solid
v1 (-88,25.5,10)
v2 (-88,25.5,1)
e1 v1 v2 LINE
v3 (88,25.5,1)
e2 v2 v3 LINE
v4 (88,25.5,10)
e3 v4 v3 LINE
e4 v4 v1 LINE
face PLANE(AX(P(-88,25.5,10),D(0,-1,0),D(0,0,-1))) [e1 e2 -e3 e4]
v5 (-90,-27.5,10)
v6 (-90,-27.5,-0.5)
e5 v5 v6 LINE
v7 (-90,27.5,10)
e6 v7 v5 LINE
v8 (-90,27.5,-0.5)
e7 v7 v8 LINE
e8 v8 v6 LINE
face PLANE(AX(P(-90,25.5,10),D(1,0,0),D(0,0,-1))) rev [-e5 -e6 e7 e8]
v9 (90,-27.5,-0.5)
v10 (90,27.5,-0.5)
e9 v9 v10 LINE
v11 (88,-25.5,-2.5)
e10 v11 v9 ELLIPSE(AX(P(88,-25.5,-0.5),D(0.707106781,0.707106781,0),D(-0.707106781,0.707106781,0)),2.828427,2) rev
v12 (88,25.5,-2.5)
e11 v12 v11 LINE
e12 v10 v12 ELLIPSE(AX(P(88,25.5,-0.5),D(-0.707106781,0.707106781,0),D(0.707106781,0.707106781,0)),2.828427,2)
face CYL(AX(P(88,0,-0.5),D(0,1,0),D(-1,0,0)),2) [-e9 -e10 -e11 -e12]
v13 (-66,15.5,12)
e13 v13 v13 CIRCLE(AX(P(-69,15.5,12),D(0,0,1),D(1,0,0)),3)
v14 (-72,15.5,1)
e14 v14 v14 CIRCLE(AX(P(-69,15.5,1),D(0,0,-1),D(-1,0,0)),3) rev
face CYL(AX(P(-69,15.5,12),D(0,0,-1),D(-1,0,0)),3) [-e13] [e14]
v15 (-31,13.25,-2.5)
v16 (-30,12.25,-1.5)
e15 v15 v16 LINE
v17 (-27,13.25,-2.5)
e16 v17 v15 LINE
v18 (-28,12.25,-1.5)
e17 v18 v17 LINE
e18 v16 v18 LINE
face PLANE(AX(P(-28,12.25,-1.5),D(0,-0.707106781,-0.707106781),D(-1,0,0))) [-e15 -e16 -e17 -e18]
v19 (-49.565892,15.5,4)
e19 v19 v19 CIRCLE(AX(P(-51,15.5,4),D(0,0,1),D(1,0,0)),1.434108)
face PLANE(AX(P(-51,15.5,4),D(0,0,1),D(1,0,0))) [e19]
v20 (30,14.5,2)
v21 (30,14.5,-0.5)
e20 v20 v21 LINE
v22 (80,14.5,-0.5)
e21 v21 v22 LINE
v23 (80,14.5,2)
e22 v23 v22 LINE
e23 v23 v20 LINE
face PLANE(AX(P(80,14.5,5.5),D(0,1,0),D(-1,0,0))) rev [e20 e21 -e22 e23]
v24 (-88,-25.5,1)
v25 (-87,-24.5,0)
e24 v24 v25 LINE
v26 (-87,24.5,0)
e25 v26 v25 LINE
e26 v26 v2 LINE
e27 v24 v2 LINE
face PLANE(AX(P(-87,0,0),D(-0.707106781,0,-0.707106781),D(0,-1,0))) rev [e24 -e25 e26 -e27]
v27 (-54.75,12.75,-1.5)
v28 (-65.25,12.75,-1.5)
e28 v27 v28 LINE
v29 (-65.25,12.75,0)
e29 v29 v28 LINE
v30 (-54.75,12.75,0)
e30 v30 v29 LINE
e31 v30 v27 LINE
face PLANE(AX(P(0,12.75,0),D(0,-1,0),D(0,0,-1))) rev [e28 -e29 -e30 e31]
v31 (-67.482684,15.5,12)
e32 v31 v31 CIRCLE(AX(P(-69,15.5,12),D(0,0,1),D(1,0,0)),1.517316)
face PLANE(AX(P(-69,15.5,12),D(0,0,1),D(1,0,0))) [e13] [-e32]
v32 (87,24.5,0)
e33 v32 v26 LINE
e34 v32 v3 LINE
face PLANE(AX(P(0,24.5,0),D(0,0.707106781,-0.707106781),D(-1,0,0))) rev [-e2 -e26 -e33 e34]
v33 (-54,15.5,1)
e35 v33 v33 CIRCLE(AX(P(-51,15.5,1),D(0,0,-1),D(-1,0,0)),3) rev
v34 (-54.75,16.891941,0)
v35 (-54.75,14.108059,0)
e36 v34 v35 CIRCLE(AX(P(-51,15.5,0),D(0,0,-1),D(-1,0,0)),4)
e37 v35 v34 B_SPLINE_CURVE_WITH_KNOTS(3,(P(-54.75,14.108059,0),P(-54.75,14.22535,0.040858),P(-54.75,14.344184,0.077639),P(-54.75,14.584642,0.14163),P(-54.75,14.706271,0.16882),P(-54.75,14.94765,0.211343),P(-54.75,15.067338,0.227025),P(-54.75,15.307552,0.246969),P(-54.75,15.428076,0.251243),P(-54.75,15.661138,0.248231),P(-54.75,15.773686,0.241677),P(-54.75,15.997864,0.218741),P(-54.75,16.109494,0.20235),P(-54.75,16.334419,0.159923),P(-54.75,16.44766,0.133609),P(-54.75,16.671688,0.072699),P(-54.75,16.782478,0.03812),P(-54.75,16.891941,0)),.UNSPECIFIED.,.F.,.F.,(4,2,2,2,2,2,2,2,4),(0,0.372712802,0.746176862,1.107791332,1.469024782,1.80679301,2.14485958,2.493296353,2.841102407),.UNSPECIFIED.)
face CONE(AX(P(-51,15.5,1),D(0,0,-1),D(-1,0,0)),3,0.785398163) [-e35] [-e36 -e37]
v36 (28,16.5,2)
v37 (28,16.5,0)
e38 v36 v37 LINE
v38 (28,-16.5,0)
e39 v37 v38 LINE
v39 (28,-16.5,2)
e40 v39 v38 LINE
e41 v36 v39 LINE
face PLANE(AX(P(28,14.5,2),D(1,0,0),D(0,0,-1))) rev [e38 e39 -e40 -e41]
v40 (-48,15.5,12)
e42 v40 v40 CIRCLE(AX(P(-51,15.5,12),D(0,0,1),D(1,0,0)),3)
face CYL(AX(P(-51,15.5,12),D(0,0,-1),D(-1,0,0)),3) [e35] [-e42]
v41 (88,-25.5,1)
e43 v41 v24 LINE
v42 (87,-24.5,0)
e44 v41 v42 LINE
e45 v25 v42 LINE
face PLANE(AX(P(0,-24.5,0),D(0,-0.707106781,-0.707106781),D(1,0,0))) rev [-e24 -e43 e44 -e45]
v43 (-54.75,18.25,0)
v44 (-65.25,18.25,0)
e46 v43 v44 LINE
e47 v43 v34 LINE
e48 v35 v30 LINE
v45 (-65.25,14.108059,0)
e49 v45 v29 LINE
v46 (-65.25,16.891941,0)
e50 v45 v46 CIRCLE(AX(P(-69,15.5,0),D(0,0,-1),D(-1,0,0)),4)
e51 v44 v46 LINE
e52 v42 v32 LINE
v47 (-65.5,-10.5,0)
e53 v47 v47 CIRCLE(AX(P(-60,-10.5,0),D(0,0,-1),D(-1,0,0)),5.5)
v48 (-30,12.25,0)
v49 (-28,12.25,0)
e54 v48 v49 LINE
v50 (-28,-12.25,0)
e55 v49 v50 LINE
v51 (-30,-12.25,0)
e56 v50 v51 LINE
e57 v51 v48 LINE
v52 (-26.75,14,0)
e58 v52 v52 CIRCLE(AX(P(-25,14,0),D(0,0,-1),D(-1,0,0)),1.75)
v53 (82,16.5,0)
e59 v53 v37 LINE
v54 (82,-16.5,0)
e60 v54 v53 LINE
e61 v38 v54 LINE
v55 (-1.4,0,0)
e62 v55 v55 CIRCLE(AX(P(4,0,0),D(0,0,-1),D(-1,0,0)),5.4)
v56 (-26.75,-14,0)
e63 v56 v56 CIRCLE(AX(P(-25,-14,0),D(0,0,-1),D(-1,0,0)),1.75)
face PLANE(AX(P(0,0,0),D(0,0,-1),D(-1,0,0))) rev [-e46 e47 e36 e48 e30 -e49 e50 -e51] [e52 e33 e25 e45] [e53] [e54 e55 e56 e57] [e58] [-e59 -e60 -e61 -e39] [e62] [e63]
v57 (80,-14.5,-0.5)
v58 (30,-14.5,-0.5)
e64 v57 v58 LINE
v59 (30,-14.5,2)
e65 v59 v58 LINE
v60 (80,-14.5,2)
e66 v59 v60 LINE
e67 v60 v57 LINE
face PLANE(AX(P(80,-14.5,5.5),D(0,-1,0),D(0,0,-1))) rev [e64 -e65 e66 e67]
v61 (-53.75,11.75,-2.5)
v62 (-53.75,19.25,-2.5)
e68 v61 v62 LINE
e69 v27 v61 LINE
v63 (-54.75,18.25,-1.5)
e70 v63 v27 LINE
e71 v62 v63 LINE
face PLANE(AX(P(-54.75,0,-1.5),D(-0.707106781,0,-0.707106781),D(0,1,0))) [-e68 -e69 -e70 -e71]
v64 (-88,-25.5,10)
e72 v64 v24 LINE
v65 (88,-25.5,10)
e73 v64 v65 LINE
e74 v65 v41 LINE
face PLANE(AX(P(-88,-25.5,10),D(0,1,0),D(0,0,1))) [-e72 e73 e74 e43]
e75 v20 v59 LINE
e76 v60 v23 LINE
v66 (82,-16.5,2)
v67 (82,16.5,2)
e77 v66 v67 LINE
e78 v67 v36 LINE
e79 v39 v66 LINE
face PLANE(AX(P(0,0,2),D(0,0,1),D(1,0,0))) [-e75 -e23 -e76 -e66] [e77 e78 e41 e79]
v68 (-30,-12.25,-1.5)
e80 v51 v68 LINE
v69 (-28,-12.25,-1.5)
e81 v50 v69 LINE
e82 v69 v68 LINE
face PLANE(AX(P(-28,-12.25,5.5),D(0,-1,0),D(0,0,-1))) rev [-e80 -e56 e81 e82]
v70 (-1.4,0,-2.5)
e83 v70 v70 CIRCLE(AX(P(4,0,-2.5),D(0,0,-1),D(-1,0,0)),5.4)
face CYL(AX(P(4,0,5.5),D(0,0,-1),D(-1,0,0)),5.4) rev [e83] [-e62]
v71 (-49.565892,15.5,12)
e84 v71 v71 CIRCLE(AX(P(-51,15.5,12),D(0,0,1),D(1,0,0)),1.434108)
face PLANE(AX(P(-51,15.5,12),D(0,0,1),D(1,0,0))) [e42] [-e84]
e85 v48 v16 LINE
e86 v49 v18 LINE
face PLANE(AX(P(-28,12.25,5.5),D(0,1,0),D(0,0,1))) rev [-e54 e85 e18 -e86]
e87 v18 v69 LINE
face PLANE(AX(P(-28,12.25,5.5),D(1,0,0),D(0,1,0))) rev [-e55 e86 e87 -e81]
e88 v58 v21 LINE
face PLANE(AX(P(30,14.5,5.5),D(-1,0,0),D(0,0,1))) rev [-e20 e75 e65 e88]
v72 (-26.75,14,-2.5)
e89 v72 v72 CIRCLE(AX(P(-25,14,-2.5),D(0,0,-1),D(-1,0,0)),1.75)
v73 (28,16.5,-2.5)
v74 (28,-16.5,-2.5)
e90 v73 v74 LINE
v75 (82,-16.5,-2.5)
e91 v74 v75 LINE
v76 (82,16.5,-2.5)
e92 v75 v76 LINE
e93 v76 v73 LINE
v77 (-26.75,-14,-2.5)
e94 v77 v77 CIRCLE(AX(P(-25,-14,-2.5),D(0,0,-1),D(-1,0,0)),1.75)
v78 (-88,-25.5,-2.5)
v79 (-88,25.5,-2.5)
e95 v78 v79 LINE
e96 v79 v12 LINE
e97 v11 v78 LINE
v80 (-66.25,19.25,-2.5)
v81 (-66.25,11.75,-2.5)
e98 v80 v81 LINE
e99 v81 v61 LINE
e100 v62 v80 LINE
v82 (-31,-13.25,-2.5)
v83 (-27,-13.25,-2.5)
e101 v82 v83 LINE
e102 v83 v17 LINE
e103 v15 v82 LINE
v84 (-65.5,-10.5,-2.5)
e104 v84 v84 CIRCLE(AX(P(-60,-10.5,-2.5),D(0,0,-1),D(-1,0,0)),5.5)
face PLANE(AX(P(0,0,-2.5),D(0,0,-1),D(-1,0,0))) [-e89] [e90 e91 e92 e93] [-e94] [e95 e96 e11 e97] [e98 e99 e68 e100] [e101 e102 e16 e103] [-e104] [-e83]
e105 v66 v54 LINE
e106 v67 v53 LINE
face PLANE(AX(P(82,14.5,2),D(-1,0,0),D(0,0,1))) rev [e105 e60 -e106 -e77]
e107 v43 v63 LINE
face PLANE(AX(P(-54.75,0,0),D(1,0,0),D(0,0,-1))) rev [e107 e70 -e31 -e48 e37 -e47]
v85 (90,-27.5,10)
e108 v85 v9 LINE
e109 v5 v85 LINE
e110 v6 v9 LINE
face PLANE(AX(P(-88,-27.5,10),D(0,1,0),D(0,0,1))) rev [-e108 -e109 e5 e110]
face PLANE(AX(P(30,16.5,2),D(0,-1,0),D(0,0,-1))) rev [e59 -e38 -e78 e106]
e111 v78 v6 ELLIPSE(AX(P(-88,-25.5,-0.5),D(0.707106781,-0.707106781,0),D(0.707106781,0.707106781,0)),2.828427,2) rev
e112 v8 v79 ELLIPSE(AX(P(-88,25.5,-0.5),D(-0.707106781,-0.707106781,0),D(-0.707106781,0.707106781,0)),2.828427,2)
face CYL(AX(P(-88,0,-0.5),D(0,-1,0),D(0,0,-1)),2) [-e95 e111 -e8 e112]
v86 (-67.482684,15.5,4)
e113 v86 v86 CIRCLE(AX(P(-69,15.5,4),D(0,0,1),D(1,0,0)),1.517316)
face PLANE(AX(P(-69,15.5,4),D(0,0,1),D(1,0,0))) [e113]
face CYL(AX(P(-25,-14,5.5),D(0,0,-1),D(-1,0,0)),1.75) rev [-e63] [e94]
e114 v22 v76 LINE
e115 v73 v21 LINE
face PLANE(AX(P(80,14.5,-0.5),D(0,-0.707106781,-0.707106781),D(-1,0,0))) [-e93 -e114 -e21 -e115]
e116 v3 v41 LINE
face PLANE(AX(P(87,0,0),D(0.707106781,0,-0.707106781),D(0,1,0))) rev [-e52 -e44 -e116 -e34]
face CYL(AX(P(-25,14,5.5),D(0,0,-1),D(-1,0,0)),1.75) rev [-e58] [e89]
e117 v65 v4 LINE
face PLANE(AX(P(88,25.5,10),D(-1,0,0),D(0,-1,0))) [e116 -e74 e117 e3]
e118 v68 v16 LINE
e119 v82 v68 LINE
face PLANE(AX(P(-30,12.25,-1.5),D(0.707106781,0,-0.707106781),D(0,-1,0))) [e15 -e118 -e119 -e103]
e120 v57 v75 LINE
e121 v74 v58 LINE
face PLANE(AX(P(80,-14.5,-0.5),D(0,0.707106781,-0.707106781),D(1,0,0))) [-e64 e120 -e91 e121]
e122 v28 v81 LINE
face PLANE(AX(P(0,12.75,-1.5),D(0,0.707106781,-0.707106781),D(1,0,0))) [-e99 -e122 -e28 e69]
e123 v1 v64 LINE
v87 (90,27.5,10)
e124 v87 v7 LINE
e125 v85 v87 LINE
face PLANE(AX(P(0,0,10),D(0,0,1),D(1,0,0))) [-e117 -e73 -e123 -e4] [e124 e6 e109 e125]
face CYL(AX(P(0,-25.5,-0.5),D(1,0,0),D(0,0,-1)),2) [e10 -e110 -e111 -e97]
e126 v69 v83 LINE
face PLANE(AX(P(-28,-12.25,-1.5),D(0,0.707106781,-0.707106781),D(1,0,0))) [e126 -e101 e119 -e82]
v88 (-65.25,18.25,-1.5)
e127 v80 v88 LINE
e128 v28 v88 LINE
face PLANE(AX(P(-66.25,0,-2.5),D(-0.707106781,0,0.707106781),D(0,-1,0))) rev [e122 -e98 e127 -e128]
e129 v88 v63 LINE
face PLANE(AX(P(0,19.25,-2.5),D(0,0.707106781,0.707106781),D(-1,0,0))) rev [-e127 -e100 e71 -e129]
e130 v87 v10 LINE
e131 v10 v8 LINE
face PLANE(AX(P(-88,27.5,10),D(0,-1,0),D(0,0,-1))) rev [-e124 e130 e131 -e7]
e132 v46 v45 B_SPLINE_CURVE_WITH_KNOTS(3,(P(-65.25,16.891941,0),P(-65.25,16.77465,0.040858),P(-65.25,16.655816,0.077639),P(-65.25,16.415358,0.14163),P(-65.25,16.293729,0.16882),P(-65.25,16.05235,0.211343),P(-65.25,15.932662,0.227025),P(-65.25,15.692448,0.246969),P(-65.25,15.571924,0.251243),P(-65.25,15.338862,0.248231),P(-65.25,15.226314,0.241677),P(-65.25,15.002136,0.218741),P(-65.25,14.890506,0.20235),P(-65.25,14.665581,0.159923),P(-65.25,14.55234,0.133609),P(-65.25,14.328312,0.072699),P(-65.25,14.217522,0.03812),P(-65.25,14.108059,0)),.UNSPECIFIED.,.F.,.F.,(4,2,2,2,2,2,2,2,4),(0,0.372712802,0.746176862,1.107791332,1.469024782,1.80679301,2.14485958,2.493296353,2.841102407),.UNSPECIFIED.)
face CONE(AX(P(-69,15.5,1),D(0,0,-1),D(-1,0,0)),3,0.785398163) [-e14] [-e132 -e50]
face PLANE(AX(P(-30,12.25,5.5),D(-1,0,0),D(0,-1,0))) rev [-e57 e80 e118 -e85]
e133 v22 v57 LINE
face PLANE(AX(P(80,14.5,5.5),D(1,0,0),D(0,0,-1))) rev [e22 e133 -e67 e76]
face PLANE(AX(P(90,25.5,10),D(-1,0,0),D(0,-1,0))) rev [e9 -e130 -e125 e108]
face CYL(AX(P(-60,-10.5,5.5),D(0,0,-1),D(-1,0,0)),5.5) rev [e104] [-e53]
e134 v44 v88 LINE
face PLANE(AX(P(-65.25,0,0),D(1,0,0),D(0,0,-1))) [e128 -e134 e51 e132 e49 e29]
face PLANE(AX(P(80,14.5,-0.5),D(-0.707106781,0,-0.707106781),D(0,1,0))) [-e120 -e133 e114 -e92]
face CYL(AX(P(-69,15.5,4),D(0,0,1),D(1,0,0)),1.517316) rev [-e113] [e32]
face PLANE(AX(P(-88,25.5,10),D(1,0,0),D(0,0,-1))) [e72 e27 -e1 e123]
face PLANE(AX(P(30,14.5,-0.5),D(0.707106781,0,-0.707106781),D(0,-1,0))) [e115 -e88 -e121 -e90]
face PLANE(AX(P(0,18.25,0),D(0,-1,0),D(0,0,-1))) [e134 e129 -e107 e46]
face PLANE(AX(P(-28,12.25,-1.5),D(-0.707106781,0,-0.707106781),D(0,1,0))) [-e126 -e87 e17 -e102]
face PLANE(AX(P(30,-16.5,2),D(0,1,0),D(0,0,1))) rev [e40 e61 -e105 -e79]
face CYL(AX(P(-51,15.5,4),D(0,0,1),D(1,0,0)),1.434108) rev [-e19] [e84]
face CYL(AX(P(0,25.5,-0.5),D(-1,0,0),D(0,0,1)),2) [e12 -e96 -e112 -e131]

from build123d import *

# Parameters (mm, degrees)
SKETCH_1_W          = 180
SKETCH_1_H          = 55
SKETCH_1_W_2        = 176
SKETCH_1_H_2        = 51
EXTRUDE_1_DEPTH     = 10
SKETCH_4_W          = 180
SKETCH_4_H          = 55
EXTRUDE_2_DEPTH     = 2.5
SKETCH_5_W          = 10.5
SKETCH_5_H          = 5.5
CUT_EXTRUDE_1_DEPTH = 2.5
SKETCH_7_R          = 3
EXTRUDE_3_DEPTH     = 12
SKETCH_8_R          = 1.517316024
SKETCH_8_R_2        = 1.4341078
CUT_EXTRUDE_2_DEPTH = 8
SKETCH_9_R          = 5.5
CUT_EXTRUDE_3_DEPTH = 8
SKETCH_10_R         = 1.75
CUT_EXTRUDE_4_DEPTH = 8
SKETCH_12_W         = 2
SKETCH_12_H         = 24.5
CUT_EXTRUDE_5_DEPTH = 8
SKETCH_13_R         = 5.4
CUT_EXTRUDE_6_DEPTH = 8
SKETCH_15_W         = 50
SKETCH_15_H         = 29
CUT_EXTRUDE_7_DEPTH = 8
SKETCH_16_W         = 54
SKETCH_16_H         = 33
SKETCH_16_W_2       = 50
SKETCH_16_H_2       = 29
EXTRUDE_2_2_DEPTH   = 2
CHAMFER_1_SIZE      = 2
CHAMFER_2_SIZE      = 1
CHAMFER_3_SIZE      = 1
CHAMFER_4_SIZE      = 1
CHAMFER_5_SIZE      = 1
FILLET_1_R          = 2


with BuildPart() as part:
    # Эскиз1 → Вытянуть-Тонкостенный1 (new body)
    with BuildSketch(Plane.XY):
        Rectangle(SKETCH_1_W, SKETCH_1_H)
        Rectangle(SKETCH_1_W_2, SKETCH_1_H_2, mode=Mode.SUBTRACT)
    extrude(amount=EXTRUDE_1_DEPTH)

    # Эскиз4 → Extrude 2 (add)
    with BuildSketch(Plane(origin=(0, 0, 0), x_dir=(-1, 0, 0), z_dir=(0, 0, -1))):
        Rectangle(SKETCH_4_W, SKETCH_4_H)
    extrude(amount=EXTRUDE_2_DEPTH)

    # Эскиз5 → Вырез-Вытянуть1 (cut)
    with BuildSketch(Plane(origin=(0, 0, -2.5), x_dir=(-1, 0, 0), z_dir=(0, 0, -1))):
        with Locations((60, 15.5)):
            Rectangle(SKETCH_5_W, SKETCH_5_H)
    extrude(amount=-CUT_EXTRUDE_1_DEPTH, mode=Mode.SUBTRACT)

    # Эскиз7 → Бобышка-Вытянуть3 (add)
    with BuildSketch(Plane.XY):
        with Locations(Location((-51, 15.5, 0), (0, 0, 180))):
            Circle(SKETCH_7_R)
        with Locations(Location((-69, 15.5, 0), (0, 0, 180))):
            Circle(SKETCH_7_R)
    extrude(amount=EXTRUDE_3_DEPTH)

    # Эскиз8 → Вырез-Вытянуть2 (cut)
    with BuildSketch(Plane.XY.offset(12)):
        with Locations((-69, 15.5)):
            Circle(SKETCH_8_R)
        with Locations((-51, 15.5)):
            Circle(SKETCH_8_R_2)
    extrude(amount=-CUT_EXTRUDE_2_DEPTH, mode=Mode.SUBTRACT)

    # Эскиз9 → Вырез-Вытянуть3 (cut)
    with BuildSketch(Plane(origin=(0, 0, -2.5), x_dir=(-1, 0, 0), z_dir=(0, 0, -1))):
        with Locations((60, -10.5)):
            Circle(SKETCH_9_R)
    extrude(amount=-CUT_EXTRUDE_3_DEPTH, mode=Mode.SUBTRACT)

    # Эскиз10 → Вырез-Вытянуть4 (cut)
    with BuildSketch(Plane(origin=(0, 0, -2.5), x_dir=(-1, 0, 0), z_dir=(0, 0, -1))):
        with Locations((25, 14)):
            Circle(SKETCH_10_R)
        with Locations((25, -14)):
            Circle(SKETCH_10_R)
    extrude(amount=-CUT_EXTRUDE_4_DEPTH, mode=Mode.SUBTRACT)

    # Эскиз12 → Вырез-Вытянуть5 (cut)
    with BuildSketch(Plane(origin=(0, 0, -2.5), x_dir=(-1, 0, 0), z_dir=(0, 0, -1))):
        with Locations((29, 0)):
            Rectangle(SKETCH_12_W, SKETCH_12_H)
    extrude(amount=-CUT_EXTRUDE_5_DEPTH, mode=Mode.SUBTRACT)

    # Эскиз13 → Вырез-Вытянуть6 (cut)
    with BuildSketch(Plane(origin=(0, 0, -2.5), x_dir=(-1, 0, 0), z_dir=(0, 0, -1))):
        with Locations((-4, 0)):
            Circle(SKETCH_13_R)
    extrude(amount=-CUT_EXTRUDE_6_DEPTH, mode=Mode.SUBTRACT)

    # Эскиз15 → Вырез-Вытянуть7 (cut)
    with BuildSketch(Plane(origin=(0, 0, -2.5), x_dir=(-1, 0, 0), z_dir=(0, 0, -1))):
        with Locations((-55, 0)):
            Rectangle(SKETCH_15_W, SKETCH_15_H)
    extrude(amount=-CUT_EXTRUDE_7_DEPTH, mode=Mode.SUBTRACT)

    # Эскиз16 → Extrude 2 2 (add)
    with BuildSketch(Plane.XY):
        with Locations((55, 0)):
            Rectangle(SKETCH_16_W, SKETCH_16_H)
        with Locations((55, 0)):
            Rectangle(SKETCH_16_W_2, SKETCH_16_H_2, mode=Mode.SUBTRACT)
    extrude(amount=EXTRUDE_2_2_DEPTH)

    # Фаска1
    chamfer_1_edges = [part.edges().sort_by_distance(p)[0] for p in [
        (80, 0, -2.5),
        (55, -14.5, -2.5),
        (30, 0, -2.5),
        (55, 14.5, -2.5),
    ]]
    chamfer(chamfer_1_edges, length=CHAMFER_1_SIZE)

    # Фаска2
    chamfer_2_edges = [part.edges().sort_by_distance(p)[0] for p in [
        (-30, 0, -2.5),
        (-29, 12.25, -2.5),
        (-28, 0, -2.5),
        (-29, -12.25, -2.5),
    ]]
    chamfer(chamfer_2_edges, length=CHAMFER_2_SIZE)

    # Фаска3
    chamfer_3_edges = [part.edges().sort_by_distance(p)[0] for p in [
        (-65.25, 15.5, -2.5),
        (-60, 18.25, -2.5),
        (-54.75, 15.5, -2.5),
        (-60, 12.75, -2.5),
    ]]
    chamfer(chamfer_3_edges, length=CHAMFER_3_SIZE)

    # Фаска4
    # the kernel refuses this chamfer: 1 mm, written as the material it adds along each edge
    with BuildSketch(Plane(origin=(-51, 15.5, 0), x_dir=(-1, 0, 0), z_dir=(0, 1, 0))) as chamfer_4_piece_1_section:
        Polygon((3 + CHAMFER_4_SIZE, 0), (3, CHAMFER_4_SIZE), (3, 0), align=None)
    chamfer_4_piece_1 = revolve(axis=Axis((-51, 15.5, 0), (0, 0, 1)), mode=Mode.PRIVATE)
    chamfer_4_piece_1 = split(chamfer_4_piece_1, bisect_by=Plane(origin=(-54.75, 15.5, 0.484065112), z_dir=(1, 0, 0)), keep=Keep.TOP, mode=Mode.PRIVATE)
    add(chamfer_4_piece_1)
    with BuildSketch(Plane(origin=(-69, 15.5, 0), x_dir=(-1, 0, 0), z_dir=(0, 1, 0))) as chamfer_4_piece_2_section:
        Polygon((3 + CHAMFER_4_SIZE, 0), (3, CHAMFER_4_SIZE), (3, 0), align=None)
    chamfer_4_piece_2 = revolve(axis=Axis((-69, 15.5, 0), (0, 0, 1)), mode=Mode.PRIVATE)
    chamfer_4_piece_2 = split(chamfer_4_piece_2, bisect_by=Plane(origin=(-65.25, 15.5, 0.484065116), z_dir=(-1, 0, 0)), keep=Keep.TOP, mode=Mode.PRIVATE)
    add(chamfer_4_piece_2)

    # Фаска5
    chamfer_5_edges = [part.edges().sort_by_distance(p)[0] for p in [
        (88, 0, 0),
        (0, 25.5, 0),
        (-88, 0, 0),
        (0, -25.5, 0),
    ]]
    chamfer(chamfer_5_edges, length=CHAMFER_5_SIZE)

    # Скругление1
    fillet_1_edges = [part.edges().sort_by_distance(p)[0] for p in [
        (-90, 0, -2.5),
        (0, 27.5, -2.5),
        (90, 0, -2.5),
        (0, -27.5, -2.5),
    ]]
    fillet(fillet_1_edges, radius=FILLET_1_R)


solid = part.part
